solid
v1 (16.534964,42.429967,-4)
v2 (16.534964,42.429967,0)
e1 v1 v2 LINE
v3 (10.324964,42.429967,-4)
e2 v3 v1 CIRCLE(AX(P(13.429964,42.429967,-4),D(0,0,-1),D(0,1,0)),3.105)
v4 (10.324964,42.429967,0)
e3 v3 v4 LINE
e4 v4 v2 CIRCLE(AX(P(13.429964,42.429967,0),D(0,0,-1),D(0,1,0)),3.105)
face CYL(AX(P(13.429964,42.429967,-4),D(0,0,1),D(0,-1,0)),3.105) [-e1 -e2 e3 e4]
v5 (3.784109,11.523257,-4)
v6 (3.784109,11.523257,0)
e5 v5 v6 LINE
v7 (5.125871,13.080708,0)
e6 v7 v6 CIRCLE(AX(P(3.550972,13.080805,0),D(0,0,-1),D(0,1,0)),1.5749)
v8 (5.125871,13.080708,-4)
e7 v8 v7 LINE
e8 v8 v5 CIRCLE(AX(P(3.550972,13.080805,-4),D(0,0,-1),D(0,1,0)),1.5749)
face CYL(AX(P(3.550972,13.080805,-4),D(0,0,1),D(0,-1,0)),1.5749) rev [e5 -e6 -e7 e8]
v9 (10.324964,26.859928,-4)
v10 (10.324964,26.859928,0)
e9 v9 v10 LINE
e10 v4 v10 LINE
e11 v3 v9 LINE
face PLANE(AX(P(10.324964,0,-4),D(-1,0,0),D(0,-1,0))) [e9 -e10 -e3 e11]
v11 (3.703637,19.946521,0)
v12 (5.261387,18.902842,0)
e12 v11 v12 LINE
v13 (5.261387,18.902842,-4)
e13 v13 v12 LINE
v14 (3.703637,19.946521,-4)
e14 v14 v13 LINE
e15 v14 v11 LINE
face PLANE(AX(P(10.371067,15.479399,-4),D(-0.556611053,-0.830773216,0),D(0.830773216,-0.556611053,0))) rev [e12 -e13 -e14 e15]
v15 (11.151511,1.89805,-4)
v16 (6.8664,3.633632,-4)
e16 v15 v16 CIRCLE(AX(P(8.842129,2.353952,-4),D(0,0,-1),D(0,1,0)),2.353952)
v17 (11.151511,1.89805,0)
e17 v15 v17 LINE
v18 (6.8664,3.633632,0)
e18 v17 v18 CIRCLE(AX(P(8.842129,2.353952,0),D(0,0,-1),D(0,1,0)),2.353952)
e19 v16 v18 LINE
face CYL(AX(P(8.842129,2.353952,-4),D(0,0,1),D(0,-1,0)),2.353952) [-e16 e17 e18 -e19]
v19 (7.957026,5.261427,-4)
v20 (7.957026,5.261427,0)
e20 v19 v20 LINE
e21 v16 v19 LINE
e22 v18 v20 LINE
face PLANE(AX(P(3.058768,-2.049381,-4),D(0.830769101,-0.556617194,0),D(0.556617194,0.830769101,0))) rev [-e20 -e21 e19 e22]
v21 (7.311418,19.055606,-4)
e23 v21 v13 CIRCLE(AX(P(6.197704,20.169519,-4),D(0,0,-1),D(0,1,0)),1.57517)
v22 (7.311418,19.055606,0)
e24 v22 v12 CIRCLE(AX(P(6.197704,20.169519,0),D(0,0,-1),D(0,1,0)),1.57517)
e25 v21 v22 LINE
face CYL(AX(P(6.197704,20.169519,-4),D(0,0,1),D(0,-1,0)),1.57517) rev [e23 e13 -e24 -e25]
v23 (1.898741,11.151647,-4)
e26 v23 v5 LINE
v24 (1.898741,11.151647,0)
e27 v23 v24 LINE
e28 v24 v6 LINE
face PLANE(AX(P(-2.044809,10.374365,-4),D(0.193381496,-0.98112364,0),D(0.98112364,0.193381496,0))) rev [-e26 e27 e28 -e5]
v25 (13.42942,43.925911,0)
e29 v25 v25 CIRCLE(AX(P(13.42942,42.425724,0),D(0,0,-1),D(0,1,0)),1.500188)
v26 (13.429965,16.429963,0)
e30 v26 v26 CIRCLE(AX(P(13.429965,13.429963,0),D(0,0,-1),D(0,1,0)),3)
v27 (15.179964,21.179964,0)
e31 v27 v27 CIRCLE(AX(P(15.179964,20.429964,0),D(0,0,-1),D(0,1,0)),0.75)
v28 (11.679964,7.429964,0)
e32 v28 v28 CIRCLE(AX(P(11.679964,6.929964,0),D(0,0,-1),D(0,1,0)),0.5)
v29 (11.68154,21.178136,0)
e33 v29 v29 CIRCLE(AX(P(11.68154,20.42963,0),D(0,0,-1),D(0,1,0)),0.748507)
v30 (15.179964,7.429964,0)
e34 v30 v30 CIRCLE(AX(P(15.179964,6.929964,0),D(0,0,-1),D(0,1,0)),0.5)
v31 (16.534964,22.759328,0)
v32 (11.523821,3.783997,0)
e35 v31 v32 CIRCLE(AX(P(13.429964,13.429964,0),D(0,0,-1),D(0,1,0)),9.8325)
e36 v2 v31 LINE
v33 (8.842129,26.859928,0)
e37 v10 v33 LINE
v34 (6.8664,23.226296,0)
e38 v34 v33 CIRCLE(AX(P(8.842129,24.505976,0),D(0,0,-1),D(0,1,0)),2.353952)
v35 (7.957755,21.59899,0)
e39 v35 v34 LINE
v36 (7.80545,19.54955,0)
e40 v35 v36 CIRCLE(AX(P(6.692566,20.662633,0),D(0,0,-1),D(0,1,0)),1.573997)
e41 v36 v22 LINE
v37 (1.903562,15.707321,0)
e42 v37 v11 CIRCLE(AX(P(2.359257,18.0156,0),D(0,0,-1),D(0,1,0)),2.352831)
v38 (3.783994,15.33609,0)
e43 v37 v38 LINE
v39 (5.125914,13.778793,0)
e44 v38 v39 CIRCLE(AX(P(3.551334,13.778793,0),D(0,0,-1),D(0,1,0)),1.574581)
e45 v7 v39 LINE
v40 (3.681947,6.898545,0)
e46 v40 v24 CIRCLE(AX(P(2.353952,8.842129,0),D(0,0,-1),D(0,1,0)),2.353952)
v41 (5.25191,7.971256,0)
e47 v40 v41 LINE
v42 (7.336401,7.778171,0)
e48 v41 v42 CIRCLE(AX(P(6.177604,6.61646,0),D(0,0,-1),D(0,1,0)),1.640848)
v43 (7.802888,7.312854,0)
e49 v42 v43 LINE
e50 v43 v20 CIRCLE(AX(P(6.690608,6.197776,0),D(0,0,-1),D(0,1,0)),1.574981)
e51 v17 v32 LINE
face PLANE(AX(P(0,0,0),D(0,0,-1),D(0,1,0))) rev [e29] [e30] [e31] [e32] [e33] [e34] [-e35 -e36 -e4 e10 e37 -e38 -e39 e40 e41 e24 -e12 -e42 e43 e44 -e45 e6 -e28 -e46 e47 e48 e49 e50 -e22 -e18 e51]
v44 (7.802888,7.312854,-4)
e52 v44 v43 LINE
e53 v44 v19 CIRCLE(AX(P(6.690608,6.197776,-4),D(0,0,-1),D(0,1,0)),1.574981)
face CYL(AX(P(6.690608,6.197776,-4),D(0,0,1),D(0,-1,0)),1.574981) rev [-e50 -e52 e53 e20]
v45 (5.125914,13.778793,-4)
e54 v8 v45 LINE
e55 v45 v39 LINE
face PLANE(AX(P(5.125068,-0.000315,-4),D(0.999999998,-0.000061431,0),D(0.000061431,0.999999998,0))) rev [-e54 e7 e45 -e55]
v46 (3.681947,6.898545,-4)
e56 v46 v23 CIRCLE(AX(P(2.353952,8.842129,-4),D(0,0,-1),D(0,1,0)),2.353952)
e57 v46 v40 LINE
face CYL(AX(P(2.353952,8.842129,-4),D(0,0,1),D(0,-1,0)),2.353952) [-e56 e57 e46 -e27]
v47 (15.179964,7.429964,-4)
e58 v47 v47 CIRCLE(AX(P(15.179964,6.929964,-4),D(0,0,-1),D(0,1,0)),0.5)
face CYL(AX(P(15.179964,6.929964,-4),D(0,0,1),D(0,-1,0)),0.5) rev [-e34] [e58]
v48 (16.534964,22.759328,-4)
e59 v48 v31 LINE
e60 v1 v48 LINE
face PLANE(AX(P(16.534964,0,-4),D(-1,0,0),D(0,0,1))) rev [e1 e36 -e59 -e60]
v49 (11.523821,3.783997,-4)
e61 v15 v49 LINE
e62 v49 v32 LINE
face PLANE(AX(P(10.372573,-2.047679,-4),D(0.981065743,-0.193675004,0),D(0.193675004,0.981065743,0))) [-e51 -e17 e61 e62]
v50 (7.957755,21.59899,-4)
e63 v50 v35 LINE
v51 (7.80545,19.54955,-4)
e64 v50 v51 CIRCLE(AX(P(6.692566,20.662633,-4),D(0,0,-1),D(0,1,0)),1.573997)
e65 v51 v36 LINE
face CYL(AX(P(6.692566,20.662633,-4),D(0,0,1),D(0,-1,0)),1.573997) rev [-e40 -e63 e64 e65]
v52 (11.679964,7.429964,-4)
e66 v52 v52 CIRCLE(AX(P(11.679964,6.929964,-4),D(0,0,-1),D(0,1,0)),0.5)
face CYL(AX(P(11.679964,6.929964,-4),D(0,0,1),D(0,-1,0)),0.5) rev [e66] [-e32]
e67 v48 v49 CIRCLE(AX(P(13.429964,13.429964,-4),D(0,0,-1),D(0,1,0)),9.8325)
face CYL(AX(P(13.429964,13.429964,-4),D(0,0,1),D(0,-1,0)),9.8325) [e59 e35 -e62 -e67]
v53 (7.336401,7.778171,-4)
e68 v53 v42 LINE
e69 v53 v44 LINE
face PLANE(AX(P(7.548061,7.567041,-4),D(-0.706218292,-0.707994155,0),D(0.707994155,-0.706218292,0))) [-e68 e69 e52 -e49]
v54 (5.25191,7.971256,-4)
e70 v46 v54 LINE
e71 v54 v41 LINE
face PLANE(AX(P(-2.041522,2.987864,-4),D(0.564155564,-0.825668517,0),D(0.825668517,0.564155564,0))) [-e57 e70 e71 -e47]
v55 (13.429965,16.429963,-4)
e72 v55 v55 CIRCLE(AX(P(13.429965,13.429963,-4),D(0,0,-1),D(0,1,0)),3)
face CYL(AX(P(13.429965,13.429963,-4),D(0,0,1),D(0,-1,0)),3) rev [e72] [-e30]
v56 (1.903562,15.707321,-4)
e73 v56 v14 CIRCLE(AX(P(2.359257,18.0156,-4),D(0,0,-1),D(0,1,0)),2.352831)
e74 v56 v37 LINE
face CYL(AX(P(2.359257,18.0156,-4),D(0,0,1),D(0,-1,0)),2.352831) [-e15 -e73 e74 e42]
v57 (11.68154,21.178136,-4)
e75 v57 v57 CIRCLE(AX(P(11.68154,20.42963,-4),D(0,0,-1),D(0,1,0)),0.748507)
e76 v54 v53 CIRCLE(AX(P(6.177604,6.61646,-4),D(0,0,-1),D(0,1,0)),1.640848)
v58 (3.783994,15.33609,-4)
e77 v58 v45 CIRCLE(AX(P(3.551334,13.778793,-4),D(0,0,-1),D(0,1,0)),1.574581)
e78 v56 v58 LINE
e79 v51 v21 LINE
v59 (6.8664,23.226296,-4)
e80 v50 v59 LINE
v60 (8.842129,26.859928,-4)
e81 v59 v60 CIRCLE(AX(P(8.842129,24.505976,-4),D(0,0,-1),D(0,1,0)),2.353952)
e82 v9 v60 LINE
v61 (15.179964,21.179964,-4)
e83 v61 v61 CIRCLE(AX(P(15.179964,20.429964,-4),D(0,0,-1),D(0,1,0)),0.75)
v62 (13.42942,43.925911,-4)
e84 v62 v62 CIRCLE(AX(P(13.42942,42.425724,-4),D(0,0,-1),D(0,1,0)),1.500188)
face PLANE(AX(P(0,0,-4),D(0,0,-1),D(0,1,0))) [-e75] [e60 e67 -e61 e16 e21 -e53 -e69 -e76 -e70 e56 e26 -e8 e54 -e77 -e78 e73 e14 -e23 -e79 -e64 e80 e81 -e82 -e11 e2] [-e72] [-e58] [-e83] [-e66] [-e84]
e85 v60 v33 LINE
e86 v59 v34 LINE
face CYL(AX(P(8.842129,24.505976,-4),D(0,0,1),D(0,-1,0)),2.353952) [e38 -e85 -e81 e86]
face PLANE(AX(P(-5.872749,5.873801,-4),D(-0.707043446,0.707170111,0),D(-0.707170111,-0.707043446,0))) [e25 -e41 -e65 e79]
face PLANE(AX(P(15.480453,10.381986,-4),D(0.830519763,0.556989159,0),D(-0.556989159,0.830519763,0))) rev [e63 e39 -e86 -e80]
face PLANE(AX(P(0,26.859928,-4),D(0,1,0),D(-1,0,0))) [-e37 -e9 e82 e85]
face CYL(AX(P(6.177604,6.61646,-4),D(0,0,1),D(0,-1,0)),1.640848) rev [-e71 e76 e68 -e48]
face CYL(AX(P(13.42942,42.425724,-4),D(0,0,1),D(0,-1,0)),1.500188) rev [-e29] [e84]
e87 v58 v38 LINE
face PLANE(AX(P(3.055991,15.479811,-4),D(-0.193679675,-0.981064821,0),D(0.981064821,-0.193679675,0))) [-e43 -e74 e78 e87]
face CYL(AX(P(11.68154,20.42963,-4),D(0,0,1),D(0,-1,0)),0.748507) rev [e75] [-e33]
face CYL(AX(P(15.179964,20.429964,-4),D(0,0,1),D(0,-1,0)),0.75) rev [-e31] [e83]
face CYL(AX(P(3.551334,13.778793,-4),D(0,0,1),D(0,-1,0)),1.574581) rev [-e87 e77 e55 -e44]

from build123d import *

# Parameters (mm, degrees)
SKETCH1_R           = 0.499999685
SKETCH1_R_2         = 0.499999936
SKETCH1_R_3         = 3.000000209
SKETCH1_R_4         = 0.750000452
SKETCH1_R_5         = 0.748506913
SKETCH1_R_6         = 1.500187581
BOSS_EXTRUDE1_DEPTH = 4


# Read off the part's stored shape, not the designer's step: Imported1
with BuildPart() as part:
    # Sketch1 → Boss-Extrude1 (new body)
    with BuildSketch(Plane(origin=(0, 0, 0), x_dir=(-1, 0, 0), z_dir=(0, 0, -1))):
        with BuildLine():
            ThreePointArc((-10.3249643, 42.429967422), (-13.429964129, 45.534967549), (-16.534963959, 42.429967422))
            Line((-16.534963959, 42.429967422), (-16.534963959, 22.759328173))
            ThreePointArc((-16.534963959, 22.759328173), (-22.936546798, 10.91939696), (-11.523821193, 3.783997304))
            Line((-11.523821193, 3.783997304), (-11.151510993, 1.898050354))
            ThreePointArc((-11.151510993, 1.898050354), (-7.958448418, 0.172164331), (-6.866399752, 3.633632355))
            Line((-6.866399752, 3.633632355), (-6.907151039, 3.694454964))
            Line((-6.907151039, 3.694454964), (-7.95702579, 5.261426867))
            ThreePointArc((-7.95702579, 5.261426867), (-8.261161621, 6.315782715), (-7.802888126, 7.312853556))
            Line((-7.802888126, 7.312853556), (-7.336401059, 7.778170532))
            ThreePointArc((-7.336401059, 7.778170532), (-6.328947455, 8.250313315), (-5.25191043, 7.971256294))
            Line((-5.25191043, 7.971256294), (-3.681946925, 6.898545358))
            ThreePointArc((-3.681946925, 6.898545358), (-0.18308636, 7.931946592), (-1.898741108, 11.151647221))
            Line((-1.898741108, 11.151647221), (-3.784109013, 11.52325713))
            ThreePointArc((-3.784109013, 11.52325713), (-4.744145314, 12.052872295), (-5.125871494, 13.080708395))
            Line((-5.125871494, 13.080708395), (-5.125914366, 13.778599746))
            Line((-5.125914366, 13.778599746), (-5.125914378, 13.778793202))
            ThreePointArc((-5.125914378, 13.778793202), (-4.744155373, 14.806645767), (-3.783994211, 15.336090171))
            Line((-3.783994211, 15.336090171), (-1.90356186, 15.70732102))
            ThreePointArc((-1.90356186, 15.70732102), (-0.193583134, 18.935202355), (-3.703637126, 19.946521356))
            Line((-3.703637126, 19.946521356), (-5.261386695, 18.902842274))
            ThreePointArc((-5.261386695, 18.902842274), (-6.314757765, 18.59870429), (-7.311417899, 19.055605922))
            Line((-7.311417899, 19.055605922), (-7.805450119, 19.549549653))
            ThreePointArc((-7.805450119, 19.549549653), (-8.262234293, 20.54598288), (-7.957754629, 21.598989571))
            Line((-7.957754629, 21.598989571), (-6.908352, 23.163741071))
            Line((-6.908352, 23.163741071), (-6.866399752, 23.226295558))
            ThreePointArc((-6.866399752, 23.226295558), (-6.774111326, 25.630427698), (-8.842129144, 26.859927922))
            Line((-8.842129144, 26.859927922), (-10.3249643, 26.859927922))
            Line((-10.3249643, 26.859927922), (-10.3249643, 42.429967422))
        make_face()
        with Locations(Location((-15.179963978, 6.929964102, 0), (0, 0, 90))):
            Circle(SKETCH1_R, mode=Mode.SUBTRACT)
        with Locations(Location((-11.679964298, 6.929964382, 0), (0, 0, 90))):
            Circle(SKETCH1_R_2, mode=Mode.SUBTRACT)
        with Locations(Location((-13.42996461, 13.429962781, 0), (0, 0, 90))):
            Circle(SKETCH1_R_3, mode=Mode.SUBTRACT)
        with Locations(Location((-15.179964076, 20.429963954, 0), (0, 0, 90))):
            Circle(SKETCH1_R_4, mode=Mode.SUBTRACT)
        with Locations(Location((-11.681540167, 20.429629577, 0), (0, 0, 90))):
            Circle(SKETCH1_R_5, mode=Mode.SUBTRACT)
        with Locations(Location((-13.429420254, 42.425723706, 0), (0, 0, 90))):
            Circle(SKETCH1_R_6, mode=Mode.SUBTRACT)
    extrude(amount=BOSS_EXTRUDE1_DEPTH)


solid = part.part
